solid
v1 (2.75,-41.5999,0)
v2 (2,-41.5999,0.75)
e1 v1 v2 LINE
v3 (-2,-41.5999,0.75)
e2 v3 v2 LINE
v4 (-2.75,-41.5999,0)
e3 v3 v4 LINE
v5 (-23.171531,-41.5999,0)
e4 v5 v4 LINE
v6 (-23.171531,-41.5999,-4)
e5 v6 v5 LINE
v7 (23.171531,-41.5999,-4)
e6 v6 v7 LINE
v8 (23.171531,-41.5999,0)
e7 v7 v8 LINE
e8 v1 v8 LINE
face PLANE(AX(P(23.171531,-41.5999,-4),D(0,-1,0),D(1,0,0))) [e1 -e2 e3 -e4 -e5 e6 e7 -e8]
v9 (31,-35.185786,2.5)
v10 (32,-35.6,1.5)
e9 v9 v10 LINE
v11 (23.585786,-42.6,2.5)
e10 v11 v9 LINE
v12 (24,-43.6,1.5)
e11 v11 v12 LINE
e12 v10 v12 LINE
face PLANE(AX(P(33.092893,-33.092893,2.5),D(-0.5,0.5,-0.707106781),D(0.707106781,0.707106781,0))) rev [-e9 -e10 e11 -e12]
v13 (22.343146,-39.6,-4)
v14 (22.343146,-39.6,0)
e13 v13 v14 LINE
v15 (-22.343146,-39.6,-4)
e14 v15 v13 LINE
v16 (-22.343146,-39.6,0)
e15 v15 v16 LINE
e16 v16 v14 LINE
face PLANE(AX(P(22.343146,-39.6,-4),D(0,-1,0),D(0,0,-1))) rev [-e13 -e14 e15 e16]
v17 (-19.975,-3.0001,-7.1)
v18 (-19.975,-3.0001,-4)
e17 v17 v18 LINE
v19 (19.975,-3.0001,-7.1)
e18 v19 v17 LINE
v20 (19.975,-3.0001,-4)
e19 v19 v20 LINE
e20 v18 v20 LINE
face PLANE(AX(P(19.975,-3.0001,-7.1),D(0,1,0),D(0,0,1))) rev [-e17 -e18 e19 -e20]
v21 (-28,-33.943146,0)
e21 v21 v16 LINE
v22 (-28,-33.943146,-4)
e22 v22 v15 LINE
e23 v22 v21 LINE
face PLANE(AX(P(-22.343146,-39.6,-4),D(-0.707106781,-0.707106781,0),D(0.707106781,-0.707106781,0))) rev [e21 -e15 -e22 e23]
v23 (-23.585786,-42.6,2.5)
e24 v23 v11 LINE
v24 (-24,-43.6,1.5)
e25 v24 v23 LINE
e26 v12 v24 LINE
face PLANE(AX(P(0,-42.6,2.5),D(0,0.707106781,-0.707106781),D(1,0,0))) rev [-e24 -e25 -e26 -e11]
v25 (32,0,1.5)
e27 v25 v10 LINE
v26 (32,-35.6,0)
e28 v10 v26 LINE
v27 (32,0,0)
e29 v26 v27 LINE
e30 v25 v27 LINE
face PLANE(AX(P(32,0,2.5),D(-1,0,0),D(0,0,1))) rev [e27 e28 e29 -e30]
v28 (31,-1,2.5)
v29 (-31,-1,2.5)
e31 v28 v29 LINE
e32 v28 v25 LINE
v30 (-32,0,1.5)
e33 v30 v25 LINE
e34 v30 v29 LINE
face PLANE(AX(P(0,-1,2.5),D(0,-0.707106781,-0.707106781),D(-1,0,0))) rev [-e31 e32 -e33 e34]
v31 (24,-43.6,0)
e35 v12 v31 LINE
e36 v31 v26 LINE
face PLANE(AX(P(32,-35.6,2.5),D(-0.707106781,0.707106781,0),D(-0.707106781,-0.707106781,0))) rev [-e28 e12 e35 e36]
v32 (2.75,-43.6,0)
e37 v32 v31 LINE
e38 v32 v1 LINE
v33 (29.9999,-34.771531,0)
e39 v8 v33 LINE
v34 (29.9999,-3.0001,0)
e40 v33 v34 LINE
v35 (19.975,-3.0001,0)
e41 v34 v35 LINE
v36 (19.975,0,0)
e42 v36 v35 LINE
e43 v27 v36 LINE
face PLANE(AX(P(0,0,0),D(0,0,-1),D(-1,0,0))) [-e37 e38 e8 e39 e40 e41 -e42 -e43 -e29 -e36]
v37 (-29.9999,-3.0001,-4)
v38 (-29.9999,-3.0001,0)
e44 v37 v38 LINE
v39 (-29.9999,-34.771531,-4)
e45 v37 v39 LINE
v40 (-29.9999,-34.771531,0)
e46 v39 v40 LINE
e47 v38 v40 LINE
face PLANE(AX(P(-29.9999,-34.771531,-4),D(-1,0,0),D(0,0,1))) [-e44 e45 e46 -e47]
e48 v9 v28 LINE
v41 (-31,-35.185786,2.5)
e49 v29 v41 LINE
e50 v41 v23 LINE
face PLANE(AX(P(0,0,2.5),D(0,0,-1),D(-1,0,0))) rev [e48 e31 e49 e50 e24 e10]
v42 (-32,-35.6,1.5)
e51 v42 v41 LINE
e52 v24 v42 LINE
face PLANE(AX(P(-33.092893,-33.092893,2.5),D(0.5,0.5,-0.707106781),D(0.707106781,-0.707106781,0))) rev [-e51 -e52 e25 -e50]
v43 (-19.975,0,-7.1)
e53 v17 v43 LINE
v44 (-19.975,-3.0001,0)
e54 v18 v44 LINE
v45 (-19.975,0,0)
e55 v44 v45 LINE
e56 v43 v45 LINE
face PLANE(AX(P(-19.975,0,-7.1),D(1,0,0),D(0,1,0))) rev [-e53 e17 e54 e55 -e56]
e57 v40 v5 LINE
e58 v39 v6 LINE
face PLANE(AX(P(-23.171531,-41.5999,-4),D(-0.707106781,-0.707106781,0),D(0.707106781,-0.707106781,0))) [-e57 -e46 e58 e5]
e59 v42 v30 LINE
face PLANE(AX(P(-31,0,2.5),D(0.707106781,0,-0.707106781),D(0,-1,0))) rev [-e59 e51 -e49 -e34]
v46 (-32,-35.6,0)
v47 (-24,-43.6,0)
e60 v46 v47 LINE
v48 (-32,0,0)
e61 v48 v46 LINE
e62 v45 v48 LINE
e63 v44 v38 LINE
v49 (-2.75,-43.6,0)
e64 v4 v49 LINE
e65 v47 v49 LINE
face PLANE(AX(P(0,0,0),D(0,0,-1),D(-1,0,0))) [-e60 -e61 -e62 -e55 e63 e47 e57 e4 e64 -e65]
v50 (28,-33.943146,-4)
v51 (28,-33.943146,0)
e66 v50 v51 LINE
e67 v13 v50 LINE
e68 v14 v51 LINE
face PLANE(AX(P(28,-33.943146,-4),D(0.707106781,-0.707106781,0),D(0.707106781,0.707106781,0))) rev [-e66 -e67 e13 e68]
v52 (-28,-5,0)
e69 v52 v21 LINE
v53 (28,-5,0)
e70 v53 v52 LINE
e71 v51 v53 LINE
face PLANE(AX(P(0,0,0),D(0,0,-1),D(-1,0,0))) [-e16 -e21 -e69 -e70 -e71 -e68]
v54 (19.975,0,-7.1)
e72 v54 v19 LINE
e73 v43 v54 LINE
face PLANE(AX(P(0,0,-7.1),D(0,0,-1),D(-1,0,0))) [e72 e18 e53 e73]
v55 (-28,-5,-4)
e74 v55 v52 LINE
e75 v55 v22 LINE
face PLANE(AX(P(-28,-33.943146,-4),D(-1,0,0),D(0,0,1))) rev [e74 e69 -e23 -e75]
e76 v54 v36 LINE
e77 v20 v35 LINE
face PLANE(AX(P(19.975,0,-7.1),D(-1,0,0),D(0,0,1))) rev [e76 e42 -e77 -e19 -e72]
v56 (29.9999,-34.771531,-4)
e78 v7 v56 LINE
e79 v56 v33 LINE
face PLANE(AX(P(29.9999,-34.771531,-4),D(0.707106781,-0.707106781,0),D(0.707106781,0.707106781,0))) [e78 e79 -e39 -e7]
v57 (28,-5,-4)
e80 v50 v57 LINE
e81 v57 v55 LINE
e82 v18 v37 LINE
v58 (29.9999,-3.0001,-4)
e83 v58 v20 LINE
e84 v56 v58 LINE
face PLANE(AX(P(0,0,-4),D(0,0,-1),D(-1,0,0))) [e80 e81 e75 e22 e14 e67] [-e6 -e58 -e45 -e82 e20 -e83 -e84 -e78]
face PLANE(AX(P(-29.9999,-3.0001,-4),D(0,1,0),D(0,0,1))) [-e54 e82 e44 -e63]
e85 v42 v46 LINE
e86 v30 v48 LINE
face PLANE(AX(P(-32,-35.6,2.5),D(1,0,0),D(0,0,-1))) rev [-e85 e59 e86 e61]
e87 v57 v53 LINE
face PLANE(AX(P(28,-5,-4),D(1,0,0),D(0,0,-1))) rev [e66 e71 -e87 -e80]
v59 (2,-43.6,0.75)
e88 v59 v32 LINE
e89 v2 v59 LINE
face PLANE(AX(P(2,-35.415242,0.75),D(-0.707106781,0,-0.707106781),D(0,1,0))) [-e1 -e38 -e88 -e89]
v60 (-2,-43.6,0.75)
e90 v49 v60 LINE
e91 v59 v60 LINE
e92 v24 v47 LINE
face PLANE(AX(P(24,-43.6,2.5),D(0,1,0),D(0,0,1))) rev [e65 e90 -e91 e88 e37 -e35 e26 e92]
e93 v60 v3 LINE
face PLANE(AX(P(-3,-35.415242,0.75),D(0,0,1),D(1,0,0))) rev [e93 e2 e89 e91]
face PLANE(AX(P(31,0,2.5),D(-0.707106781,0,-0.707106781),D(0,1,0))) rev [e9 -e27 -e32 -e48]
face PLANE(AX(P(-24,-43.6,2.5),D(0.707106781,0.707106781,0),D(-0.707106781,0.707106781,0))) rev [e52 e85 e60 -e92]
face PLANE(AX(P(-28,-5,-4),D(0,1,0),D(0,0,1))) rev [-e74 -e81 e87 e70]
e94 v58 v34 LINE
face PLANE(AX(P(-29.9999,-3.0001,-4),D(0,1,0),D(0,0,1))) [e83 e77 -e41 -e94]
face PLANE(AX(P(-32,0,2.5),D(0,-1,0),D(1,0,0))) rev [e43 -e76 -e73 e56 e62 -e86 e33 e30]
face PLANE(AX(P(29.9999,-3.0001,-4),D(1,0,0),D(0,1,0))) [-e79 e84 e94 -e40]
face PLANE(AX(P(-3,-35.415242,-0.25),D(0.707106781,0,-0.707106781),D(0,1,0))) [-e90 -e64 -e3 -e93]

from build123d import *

# Parameters (mm, degrees)
BOSS_EXTRUDE1_DEPTH = 4
BOSS_EXTRUDE2_DEPTH = 2.5
CHAMFER1_SIZE       = 1
SKETCH4_W           = 6
SKETCH4_H           = 1.5
CUT_EXTRUDE1_DEPTH  = 2.0001
CHAMFER2_SIZE       = 1
SKETCH5_W           = 39.95
SKETCH5_H           = 3.0001
BOSS_EXTRUDE3_DEPTH = 7.1


with BuildPart() as part:
    # Sketch2 → Boss-Extrude1 (new body)
    with BuildSketch(Plane.XY):
        Polygon((-29.9999, -3.0001), (29.9999, -3.0001), (29.9999, -34.771531454), (23.171531454, -41.5999), (-23.171531454, -41.5999), (-29.9999, -34.771531454), align=None)
        Polygon((-28, -33.943145751), (-28, -5), (28, -5), (28, -33.943145751), (22.343145751, -39.6), (-22.343145751, -39.6), align=None, mode=Mode.SUBTRACT)
    extrude(amount=-BOSS_EXTRUDE1_DEPTH)

    # Sketch3 → Boss-Extrude2 (add)
    with BuildSketch(Plane.XY):
        Polygon((-32, 0), (32, 0), (32, -35.6), (24, -43.6), (-24, -43.6), (-32, -35.6), align=None)
    extrude(amount=BOSS_EXTRUDE2_DEPTH)

    # Chamfer1
    chamfer1_edges = [part.edges().sort_by_distance(p)[0] for p in [
        (-32, -17.8, 2.5),
        (-28, -39.6, 2.5),
        (0, -43.6, 2.5),
        (28, -39.6, 2.5),
        (32, -17.8, 2.5),
        (0, 0, 2.5),
    ]]
    chamfer(chamfer1_edges, length=CHAMFER1_SIZE)

    # Sketch4 → Cut-Extrude1 (cut)
    with BuildSketch(Plane.XZ.offset(43.6)):
        Rectangle(SKETCH4_W, SKETCH4_H)
    extrude(amount=-CUT_EXTRUDE1_DEPTH, mode=Mode.SUBTRACT)

    # Chamfer2
    # the kernel refuses this chamfer: 1 mm, written as the material it adds along each edge
    with BuildSketch(Plane(origin=(3, -43.6, 0.75), x_dir=(0.027495876610586487, 0, -0.9996219169112968), z_dir=(0, 1, 0))) as chamfer2_piece_1_section:
        Polygon((CHAMFER2_SIZE * 0.999621916911, CHAMFER2_SIZE * 0.0274958766106), (-CHAMFER2_SIZE * 0.0274958766106, CHAMFER2_SIZE * 0.999621916911), (0, 0), align=None)
    chamfer2_piece_1 = extrude(amount=4.571782988, mode=Mode.PRIVATE)
    chamfer2_piece_1 = split(chamfer2_piece_1, bisect_by=Plane(origin=(2.65, -42.59995, 0), z_dir=(0, 0, 1)), keep=Keep.TOP, mode=Mode.PRIVATE)
    add(chamfer2_piece_1)
    with BuildSketch(Plane(origin=(-3, -43.6, 0.75), x_dir=(-0.027495876610586487, 0, -0.9996219169112968), z_dir=(0, 1, 0))) as chamfer2_piece_2_section:
        Polygon((CHAMFER2_SIZE * 0.999621916911, -CHAMFER2_SIZE * 0.0274958766106), (-CHAMFER2_SIZE * 0.0274958766106, -CHAMFER2_SIZE * 0.999621916911), (0, 0), align=None)
    chamfer2_piece_2 = extrude(amount=4.571782988, mode=Mode.PRIVATE)
    chamfer2_piece_2 = split(chamfer2_piece_2, bisect_by=Plane(origin=(-2.65, -42.59995, 0), z_dir=(0, 0, 1)), keep=Keep.TOP, mode=Mode.PRIVATE)
    add(chamfer2_piece_2)

    # Sketch5 → Boss-Extrude3 (add)
    with BuildSketch(Plane(origin=(0, 0, 0), x_dir=(-1, 0, 0), z_dir=(0, 0, -1))):
        with Locations((0, -1.50005)):
            Rectangle(SKETCH5_W, SKETCH5_H)
    extrude(amount=BOSS_EXTRUDE3_DEPTH)


solid = part.part
